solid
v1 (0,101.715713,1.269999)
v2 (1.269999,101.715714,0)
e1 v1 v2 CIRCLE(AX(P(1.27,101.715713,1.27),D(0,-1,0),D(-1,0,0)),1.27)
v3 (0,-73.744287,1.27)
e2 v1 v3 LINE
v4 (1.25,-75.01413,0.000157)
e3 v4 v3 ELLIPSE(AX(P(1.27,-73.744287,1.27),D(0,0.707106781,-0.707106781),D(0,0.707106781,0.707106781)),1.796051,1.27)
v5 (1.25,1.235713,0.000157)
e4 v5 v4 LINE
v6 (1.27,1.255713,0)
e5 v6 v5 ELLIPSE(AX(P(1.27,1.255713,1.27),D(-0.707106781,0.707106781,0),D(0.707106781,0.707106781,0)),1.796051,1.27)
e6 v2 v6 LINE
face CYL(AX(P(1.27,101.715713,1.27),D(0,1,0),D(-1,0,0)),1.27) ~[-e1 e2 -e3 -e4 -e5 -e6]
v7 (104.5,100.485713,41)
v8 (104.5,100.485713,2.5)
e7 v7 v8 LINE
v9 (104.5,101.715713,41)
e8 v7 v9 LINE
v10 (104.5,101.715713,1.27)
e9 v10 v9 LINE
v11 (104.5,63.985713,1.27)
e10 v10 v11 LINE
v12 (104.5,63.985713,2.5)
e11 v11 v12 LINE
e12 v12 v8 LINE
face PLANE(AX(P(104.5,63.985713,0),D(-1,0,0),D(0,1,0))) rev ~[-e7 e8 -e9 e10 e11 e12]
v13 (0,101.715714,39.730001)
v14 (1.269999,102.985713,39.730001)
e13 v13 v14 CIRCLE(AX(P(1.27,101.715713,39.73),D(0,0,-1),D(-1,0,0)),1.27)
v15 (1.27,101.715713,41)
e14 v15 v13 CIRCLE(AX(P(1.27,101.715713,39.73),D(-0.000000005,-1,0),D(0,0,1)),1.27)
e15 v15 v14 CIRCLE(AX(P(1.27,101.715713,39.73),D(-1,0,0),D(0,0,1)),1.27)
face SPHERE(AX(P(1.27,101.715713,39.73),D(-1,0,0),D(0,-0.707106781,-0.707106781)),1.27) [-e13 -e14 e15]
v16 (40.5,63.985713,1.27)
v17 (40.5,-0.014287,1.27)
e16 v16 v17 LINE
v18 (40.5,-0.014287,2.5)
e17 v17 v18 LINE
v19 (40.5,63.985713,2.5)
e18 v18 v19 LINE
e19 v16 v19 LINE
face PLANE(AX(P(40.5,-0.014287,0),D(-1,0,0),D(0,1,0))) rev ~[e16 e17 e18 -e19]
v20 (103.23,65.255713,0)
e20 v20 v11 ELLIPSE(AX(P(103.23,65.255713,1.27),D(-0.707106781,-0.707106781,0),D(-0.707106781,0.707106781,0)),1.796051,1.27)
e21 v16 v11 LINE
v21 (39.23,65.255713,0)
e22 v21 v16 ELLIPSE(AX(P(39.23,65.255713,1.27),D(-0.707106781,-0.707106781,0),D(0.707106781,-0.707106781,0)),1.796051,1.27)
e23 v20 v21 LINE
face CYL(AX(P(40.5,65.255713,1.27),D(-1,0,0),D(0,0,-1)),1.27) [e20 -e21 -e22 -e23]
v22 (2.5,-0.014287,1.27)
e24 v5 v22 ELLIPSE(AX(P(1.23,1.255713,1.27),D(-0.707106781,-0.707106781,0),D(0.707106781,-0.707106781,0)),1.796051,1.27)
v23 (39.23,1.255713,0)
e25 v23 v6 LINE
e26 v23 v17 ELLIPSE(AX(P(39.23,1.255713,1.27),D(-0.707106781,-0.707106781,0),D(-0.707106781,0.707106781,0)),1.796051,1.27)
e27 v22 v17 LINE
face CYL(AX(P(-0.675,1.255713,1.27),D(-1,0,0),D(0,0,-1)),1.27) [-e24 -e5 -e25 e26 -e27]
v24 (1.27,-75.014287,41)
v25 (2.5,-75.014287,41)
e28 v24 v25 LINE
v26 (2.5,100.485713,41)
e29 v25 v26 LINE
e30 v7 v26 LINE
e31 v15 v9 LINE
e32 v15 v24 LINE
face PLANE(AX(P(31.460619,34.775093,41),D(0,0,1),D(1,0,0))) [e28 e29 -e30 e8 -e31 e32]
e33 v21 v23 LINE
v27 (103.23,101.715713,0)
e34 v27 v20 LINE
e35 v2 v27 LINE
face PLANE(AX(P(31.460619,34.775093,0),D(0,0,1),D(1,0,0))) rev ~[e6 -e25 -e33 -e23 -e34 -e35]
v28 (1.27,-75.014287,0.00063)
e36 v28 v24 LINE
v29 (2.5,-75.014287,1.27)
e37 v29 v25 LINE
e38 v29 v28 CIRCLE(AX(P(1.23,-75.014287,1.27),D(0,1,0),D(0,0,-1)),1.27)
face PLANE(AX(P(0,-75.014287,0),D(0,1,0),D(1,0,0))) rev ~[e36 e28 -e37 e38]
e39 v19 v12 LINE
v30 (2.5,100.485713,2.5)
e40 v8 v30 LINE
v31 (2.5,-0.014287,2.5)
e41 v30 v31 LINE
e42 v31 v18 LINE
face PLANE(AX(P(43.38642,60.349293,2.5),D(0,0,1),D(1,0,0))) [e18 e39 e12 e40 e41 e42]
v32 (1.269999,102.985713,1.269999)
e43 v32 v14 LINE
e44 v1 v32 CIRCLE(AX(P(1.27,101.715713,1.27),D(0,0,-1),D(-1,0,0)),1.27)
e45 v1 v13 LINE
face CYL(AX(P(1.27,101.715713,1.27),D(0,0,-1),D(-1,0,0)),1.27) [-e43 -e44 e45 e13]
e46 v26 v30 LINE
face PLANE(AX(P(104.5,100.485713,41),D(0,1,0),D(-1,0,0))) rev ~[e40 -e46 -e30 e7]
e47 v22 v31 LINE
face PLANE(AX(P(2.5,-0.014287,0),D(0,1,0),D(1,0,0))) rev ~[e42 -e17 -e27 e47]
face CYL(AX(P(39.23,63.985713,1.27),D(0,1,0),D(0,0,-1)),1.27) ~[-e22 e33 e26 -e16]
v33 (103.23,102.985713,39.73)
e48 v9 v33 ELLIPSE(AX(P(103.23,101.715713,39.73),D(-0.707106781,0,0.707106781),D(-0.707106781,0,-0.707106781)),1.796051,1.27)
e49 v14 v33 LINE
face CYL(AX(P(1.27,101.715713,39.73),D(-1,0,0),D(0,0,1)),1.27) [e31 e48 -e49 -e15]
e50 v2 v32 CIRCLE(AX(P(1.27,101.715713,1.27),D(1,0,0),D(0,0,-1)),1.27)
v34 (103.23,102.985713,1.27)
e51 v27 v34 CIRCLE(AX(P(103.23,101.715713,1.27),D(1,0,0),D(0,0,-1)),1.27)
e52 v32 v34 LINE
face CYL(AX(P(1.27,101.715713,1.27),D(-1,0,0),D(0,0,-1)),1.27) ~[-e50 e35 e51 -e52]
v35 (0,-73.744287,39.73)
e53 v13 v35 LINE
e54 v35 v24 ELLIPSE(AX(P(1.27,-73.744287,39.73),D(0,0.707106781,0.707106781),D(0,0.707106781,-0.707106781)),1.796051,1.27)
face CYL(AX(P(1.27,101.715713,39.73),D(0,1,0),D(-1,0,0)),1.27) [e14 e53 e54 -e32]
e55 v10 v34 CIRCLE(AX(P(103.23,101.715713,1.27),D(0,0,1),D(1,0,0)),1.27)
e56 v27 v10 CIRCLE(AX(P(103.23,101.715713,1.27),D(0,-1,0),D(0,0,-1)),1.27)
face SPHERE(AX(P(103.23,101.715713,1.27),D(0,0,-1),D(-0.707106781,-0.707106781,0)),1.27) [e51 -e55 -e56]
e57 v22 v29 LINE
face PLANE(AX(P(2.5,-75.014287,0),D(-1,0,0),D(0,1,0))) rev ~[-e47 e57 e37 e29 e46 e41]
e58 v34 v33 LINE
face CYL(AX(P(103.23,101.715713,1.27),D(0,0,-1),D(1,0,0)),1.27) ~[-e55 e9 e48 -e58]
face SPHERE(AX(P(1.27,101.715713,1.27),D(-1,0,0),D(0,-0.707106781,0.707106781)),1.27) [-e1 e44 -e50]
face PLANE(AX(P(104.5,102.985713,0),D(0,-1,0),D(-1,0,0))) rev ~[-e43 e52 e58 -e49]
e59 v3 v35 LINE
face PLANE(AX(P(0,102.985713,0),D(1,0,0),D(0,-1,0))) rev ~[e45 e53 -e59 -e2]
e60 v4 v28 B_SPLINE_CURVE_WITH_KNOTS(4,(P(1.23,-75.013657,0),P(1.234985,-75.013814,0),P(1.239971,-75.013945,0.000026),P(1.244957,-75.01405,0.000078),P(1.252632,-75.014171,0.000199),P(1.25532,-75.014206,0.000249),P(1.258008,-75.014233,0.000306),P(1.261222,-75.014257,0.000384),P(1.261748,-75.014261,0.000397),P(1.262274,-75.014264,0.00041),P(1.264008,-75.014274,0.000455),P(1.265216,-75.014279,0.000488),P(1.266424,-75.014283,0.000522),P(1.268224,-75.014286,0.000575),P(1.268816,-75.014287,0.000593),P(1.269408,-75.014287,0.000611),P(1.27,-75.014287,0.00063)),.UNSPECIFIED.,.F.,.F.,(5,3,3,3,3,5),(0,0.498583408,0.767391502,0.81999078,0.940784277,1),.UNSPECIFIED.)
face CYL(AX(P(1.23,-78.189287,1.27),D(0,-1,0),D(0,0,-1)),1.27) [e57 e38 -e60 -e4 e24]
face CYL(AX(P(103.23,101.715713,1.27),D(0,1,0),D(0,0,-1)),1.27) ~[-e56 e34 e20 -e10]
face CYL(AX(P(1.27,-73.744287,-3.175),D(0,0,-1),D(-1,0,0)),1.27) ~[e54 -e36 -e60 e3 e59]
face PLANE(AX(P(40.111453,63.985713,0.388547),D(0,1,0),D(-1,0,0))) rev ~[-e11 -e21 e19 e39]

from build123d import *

# Parameters (mm, degrees)
F1_DEPTH     = 41
F3_DEPTH     = 38.5
F5_T1_DEPTH  = 38.46
F5_T3_DEPTH  = 179.905
F5_T5_DEPTH  = 106.405
F5_T7_DEPTH  = 47.35
F5_T9_DEPTH  = 42.905
F5_T11_DEPTH = 78.175
F5_T13_DEPTH = 41.175
F5_T15_DEPTH = 67.175
F5_T17_DEPTH = 67.175
F5_T19_DEPTH = 40.905
F5_T21_DEPTH = 101.96
F5_S25_W     = 1.27
F5_S25_H     = 1.27
F5_T26_DEPTH = 1.27
F5_S31_W     = 1.27
F5_S31_H     = 1.27
F5_T32_DEPTH = 1.27
F5_S37_W     = 1.27
F5_S37_H     = 1.27
F5_T38_DEPTH = 1.27
F5_T45_DEPTH = 81.35
F5_T49_DEPTH = 44.35
F5_T56_DEPTH = 70.35
F5_T60_DEPTH = 70.35


# Not quite as in the source:
# - a fillet or chamfer that OpenCascade refuses, or shapes differently, is made with other operations: its cross-section is extruded or revolved along the edge and cut away or added
# - a feature of the source that left no trace in its solid (it failed there, or was rolled back) is left out


with BuildPart() as f1:
    # F0 (on Top) → F1 (new body)
    with BuildSketch(Plane.XY):
        Polygon((0, 102.9857128358), (0, 0), (0, -75.0142871642), (2.5, -75.0142871642), (2.5, -0.0142871642), (40.5, -0.0142871642), (40.5, 63.9857128358), (104.5, 63.9857128358), (104.5, 102.9857128358), align=None)
    extrude(amount=F1_DEPTH)

    # F2 (on face) → F3 (cut)
    with BuildSketch(Plane.XY.offset(41)):
        Polygon((2.5, 100.4857128358), (2.5, -0.0142871642), (40.5, -0.0142871642), (40.5, 63.9857128358), (104.5, 63.9857128358), (104.5, 100.4857128358), align=None)
    extrude(amount=-F3_DEPTH, mode=Mode.SUBTRACT)

    # F5: fillet of radius 1.27 on 12 edges, made by hand

    # F5_s2 → F5_t1 (cut)
    with BuildSketch(Plane.XY.offset(1.27)):
        with BuildLine():
            ThreePointArc((0, 101.7157128358), (0.3719743879, 102.6137384479), (1.27, 102.9857128358))
            Line((1.27, 102.9857128358), (0, 102.9857128358))
            Line((0, 102.9857128358), (0, 101.7157128358))
        make_face()
    extrude(amount=F5_T1_DEPTH, mode=Mode.SUBTRACT)

    # F5_s4 → F5_t3 (cut)
    with BuildSketch(Plane.XZ.offset(-101.7157128358)):
        with BuildLine():
            ThreePointArc((0, 39.73), (0.3719743879, 40.6280256121), (1.27, 41))
            Line((1.27, 41), (0, 41))
            Line((0, 41), (0, 39.73))
        make_face()
        with BuildLine():
            ThreePointArc((0, 1.27), (0.3719743879, 0.3719743879), (1.27, 0))
            Line((1.27, 0), (0, 0))
            Line((0, 0), (0, 1.27))
        make_face()
    extrude(amount=F5_T3_DEPTH, mode=Mode.SUBTRACT)

    # F5_s6 → F5_t5 (cut)
    with BuildSketch(Plane.YZ.offset(1.27)):
        with BuildLine():
            ThreePointArc((101.7157128358, 41), (102.6137384479, 40.6280256121), (102.9857128358, 39.73))
            Line((102.9857128358, 39.73), (102.9857128358, 41))
            Line((102.9857128358, 41), (101.7157128358, 41))
        make_face()
    extrude(amount=F5_T5_DEPTH, mode=Mode.SUBTRACT)

    # F5_s8 → F5_t7 (cut)
    with BuildSketch(Plane.XY.offset(-3.175)):
        with BuildLine():
            ThreePointArc((0, -73.7442871642), (0.3719743879, -74.6423127763), (1.27, -75.0142871642))
            Line((1.27, -75.0142871642), (0, -75.0142871642))
            Line((0, -75.0142871642), (0, -73.7442871642))
        make_face()
    extrude(amount=F5_T7_DEPTH, mode=Mode.SUBTRACT)

    # F5_s10 → F5_t9 (cut)
    with BuildSketch(Plane.XY.offset(1.27)):
        with BuildLine():
            ThreePointArc((104.5, 101.7157128358), (104.1280256121, 102.6137384479), (103.23, 102.9857128358))
            Line((103.23, 102.9857128358), (104.5, 102.9857128358))
            Line((104.5, 102.9857128358), (104.5, 101.7157128358))
        make_face()
    extrude(amount=F5_T9_DEPTH, mode=Mode.SUBTRACT)

    # F5_s12 → F5_t11 (cut)
    with BuildSketch(Plane.XZ.offset(0.0142871642)):
        with BuildLine():
            ThreePointArc((1.23, 0), (2.1280256121, 0.3719743879), (2.5, 1.27))
            Line((2.5, 1.27), (2.5, 0))
            Line((2.5, 0), (1.23, 0))
        make_face()
    extrude(amount=F5_T11_DEPTH, mode=Mode.SUBTRACT)

    # F5_s14 → F5_t13 (cut)
    with BuildSketch(Plane.YZ.offset(2.5)):
        with BuildLine():
            ThreePointArc((1.2557128358, 0), (0.3576872237, 0.3719743879), (-0.0142871642, 1.27))
            Line((-0.0142871642, 1.27), (-0.0142871642, 0))
            Line((-0.0142871642, 0), (1.2557128358, 0))
        make_face()
    extrude(amount=F5_T13_DEPTH, mode=Mode.SUBTRACT)

    # F5_s16 → F5_t15 (cut)
    with BuildSketch(Plane.XZ.offset(-63.9857128358)):
        with BuildLine():
            ThreePointArc((39.23, 0), (40.1280256121, 0.3719743879), (40.5, 1.27))
            Line((40.5, 1.27), (40.5, 0))
            Line((40.5, 0), (39.23, 0))
        make_face()
    extrude(amount=F5_T15_DEPTH, mode=Mode.SUBTRACT)

    # F5_s18 → F5_t17 (cut)
    with BuildSketch(Plane.YZ.offset(40.5)):
        with BuildLine():
            ThreePointArc((65.2557128358, 0), (64.3576872237, 0.3719743879), (63.9857128358, 1.27))
            Line((63.9857128358, 1.27), (63.9857128358, 0))
            Line((63.9857128358, 0), (65.2557128358, 0))
        make_face()
    extrude(amount=F5_T17_DEPTH, mode=Mode.SUBTRACT)

    # F5_s20 → F5_t19 (cut)
    with BuildSketch(Plane.XZ.offset(-101.7157128358)):
        with BuildLine():
            ThreePointArc((103.23, 0), (104.1280256121, 0.3719743879), (104.5, 1.27))
            Line((104.5, 1.27), (104.5, 0))
            Line((104.5, 0), (103.23, 0))
        make_face()
    extrude(amount=F5_T19_DEPTH, mode=Mode.SUBTRACT)

    # F5_s22 → F5_t21 (cut)
    with BuildSketch(Plane.YZ.offset(1.27)):
        with BuildLine():
            ThreePointArc((101.7157128358, 0), (102.6137384479, 0.3719743879), (102.9857128358, 1.27))
            Line((102.9857128358, 1.27), (102.9857128358, 0))
            Line((102.9857128358, 0), (101.7157128358, 0))
        make_face()
    extrude(amount=F5_T21_DEPTH, mode=Mode.SUBTRACT)


with BuildPart() as f5_tool24:
    # F5_s25 → F5_t26 (new body)
    with BuildSketch(Plane.YZ.offset(1.27)):
        with Locations((102.3507128358, 0.635)):
            Rectangle(F5_S25_W, F5_S25_H)
    extrude(amount=-F5_T26_DEPTH)

    # F5_s27 → F5_t28 (revolve, cut)
    with BuildSketch(Plane(origin=(1.27, 101.7157128358, 1.27), x_dir=(0, -0.7071067812, 0.7071067812), z_dir=(0, -0.7071067812, -0.7071067812))):
        with BuildLine():
            ThreePointArc((0, -1.27), (1.27, 0), (0, 1.27))
            Line((0, 1.27), (0, -1.27))
        make_face()
    revolve(axis=Axis((1.27, 101.7157128358, 1.27), (-1, 0, 0)), mode=Mode.SUBTRACT)


with BuildPart() as f1_1:
    add(f1.part)

    # F5_t23: cut F5_tool24
    add(f5_tool24.part, mode=Mode.SUBTRACT)


with BuildPart() as f5_tool30:
    # F5_s31 → F5_t32 (new body)
    with BuildSketch(Plane.YZ.offset(1.27)):
        with Locations((102.3507128358, 40.365)):
            Rectangle(F5_S31_W, F5_S31_H)
    extrude(amount=-F5_T32_DEPTH)

    # F5_s33 → F5_t34 (revolve, cut)
    with BuildSketch(Plane(origin=(1.27, 101.7157128358, 39.73), x_dir=(0, -0.7071067812, -0.7071067812), z_dir=(0, 0.7071067812, -0.7071067812))):
        with BuildLine():
            ThreePointArc((0, -1.27), (1.27, 0), (0, 1.27))
            Line((0, 1.27), (0, -1.27))
        make_face()
    revolve(axis=Axis((1.27, 101.7157128358, 39.73), (-1, 0, 0)), mode=Mode.SUBTRACT)


with BuildPart() as f1_2:
    add(f1_1.part)

    # F5_t29: cut F5_tool30
    add(f5_tool30.part, mode=Mode.SUBTRACT)


with BuildPart() as f5_tool36:
    # F5_s37 → F5_t38 (new body)
    with BuildSketch(Plane.XY.offset(1.27)):
        with Locations((103.865, 102.3507128358)):
            Rectangle(F5_S37_W, F5_S37_H)
    extrude(amount=-F5_T38_DEPTH)

    # F5_s39 → F5_t40 (revolve, cut)
    with BuildSketch(Plane(origin=(103.23, 101.7157128358, 1.27), x_dir=(-0.7071067812, -0.7071067812, 0), z_dir=(0.7071067812, -0.7071067812, 0))):
        with BuildLine():
            ThreePointArc((0, -1.27), (1.27, 0), (0, 1.27))
            Line((0, 1.27), (0, -1.27))
        make_face()
    revolve(axis=Axis((103.23, 101.7157128358, 1.27), (0, 0, -1)), mode=Mode.SUBTRACT)


with BuildPart() as f1_3:
    add(f1_2.part)

    # F5_t35: cut F5_tool36
    add(f5_tool36.part, mode=Mode.SUBTRACT)


with BuildPart() as f5_tool43:
    # F5_s44 → F5_t45 (new body)
    with BuildSketch(Plane.XZ.offset(78.1892871642)):
        with BuildLine():
            ThreePointArc((1.23, 0), (2.1280256121, 0.3719743879), (2.5, 1.27))
            Line((2.5, 1.27), (2.5, 0))
            Line((2.5, 0), (1.23, 0))
        make_face()
    extrude(amount=-F5_T45_DEPTH)

    split(bisect_by=Plane.XZ.offset(0.0142871642), keep=Keep.BOTTOM)


with BuildPart() as f5_tool47:
    # F5_s48 → F5_t49 (new body)
    with BuildSketch(Plane.YZ.offset(-0.675)):
        with BuildLine():
            ThreePointArc((1.2557128358, 0), (0.3576872237, 0.3719743879), (-0.0142871642, 1.27))
            Line((-0.0142871642, 1.27), (-0.0142871642, 0))
            Line((-0.0142871642, 0), (1.2557128358, 0))
        make_face()
    extrude(amount=F5_T49_DEPTH)

    split(bisect_by=Plane.YZ.offset(2.5), keep=Keep.BOTTOM)


with BuildPart() as f5_tool43_1:
    add(f5_tool43.part)

    # F5_t51: intersect F5_tool47
    add(f5_tool47.part, mode=Mode.INTERSECT)


with BuildPart() as f1_4:
    add(f1_3.part)

    # F5_t41: cut F5_tool43
    add(f5_tool43_1.part, mode=Mode.SUBTRACT)


with BuildPart() as f5_tool54:
    # F5_s55 → F5_t56 (new body)
    with BuildSketch(Plane.XZ.offset(3.1892871642)):
        with BuildLine():
            ThreePointArc((39.23, 0), (40.1280256121, 0.3719743879), (40.5, 1.27))
            Line((40.5, 1.27), (40.5, 0))
            Line((40.5, 0), (39.23, 0))
        make_face()
    extrude(amount=-F5_T56_DEPTH)

    split(bisect_by=Plane.XZ.offset(-63.9857128358), keep=Keep.BOTTOM)


with BuildPart() as f5_tool58:
    # F5_s59 → F5_t60 (new body)
    with BuildSketch(Plane.YZ.offset(37.325)):
        with BuildLine():
            ThreePointArc((65.2557128358, 0), (64.3576872237, 0.3719743879), (63.9857128358, 1.27))
            Line((63.9857128358, 1.27), (63.9857128358, 0))
            Line((63.9857128358, 0), (65.2557128358, 0))
        make_face()
    extrude(amount=F5_T60_DEPTH)

    split(bisect_by=Plane.YZ.offset(40.5), keep=Keep.BOTTOM)


with BuildPart() as f5_tool54_1:
    add(f5_tool54.part)

    # F5_t62: intersect F5_tool58
    add(f5_tool58.part, mode=Mode.INTERSECT)


with BuildPart() as f1_5:
    add(f1_4.part)

    # F5_t52: cut F5_tool54
    add(f5_tool54_1.part, mode=Mode.SUBTRACT)


solid = f1_5.part
